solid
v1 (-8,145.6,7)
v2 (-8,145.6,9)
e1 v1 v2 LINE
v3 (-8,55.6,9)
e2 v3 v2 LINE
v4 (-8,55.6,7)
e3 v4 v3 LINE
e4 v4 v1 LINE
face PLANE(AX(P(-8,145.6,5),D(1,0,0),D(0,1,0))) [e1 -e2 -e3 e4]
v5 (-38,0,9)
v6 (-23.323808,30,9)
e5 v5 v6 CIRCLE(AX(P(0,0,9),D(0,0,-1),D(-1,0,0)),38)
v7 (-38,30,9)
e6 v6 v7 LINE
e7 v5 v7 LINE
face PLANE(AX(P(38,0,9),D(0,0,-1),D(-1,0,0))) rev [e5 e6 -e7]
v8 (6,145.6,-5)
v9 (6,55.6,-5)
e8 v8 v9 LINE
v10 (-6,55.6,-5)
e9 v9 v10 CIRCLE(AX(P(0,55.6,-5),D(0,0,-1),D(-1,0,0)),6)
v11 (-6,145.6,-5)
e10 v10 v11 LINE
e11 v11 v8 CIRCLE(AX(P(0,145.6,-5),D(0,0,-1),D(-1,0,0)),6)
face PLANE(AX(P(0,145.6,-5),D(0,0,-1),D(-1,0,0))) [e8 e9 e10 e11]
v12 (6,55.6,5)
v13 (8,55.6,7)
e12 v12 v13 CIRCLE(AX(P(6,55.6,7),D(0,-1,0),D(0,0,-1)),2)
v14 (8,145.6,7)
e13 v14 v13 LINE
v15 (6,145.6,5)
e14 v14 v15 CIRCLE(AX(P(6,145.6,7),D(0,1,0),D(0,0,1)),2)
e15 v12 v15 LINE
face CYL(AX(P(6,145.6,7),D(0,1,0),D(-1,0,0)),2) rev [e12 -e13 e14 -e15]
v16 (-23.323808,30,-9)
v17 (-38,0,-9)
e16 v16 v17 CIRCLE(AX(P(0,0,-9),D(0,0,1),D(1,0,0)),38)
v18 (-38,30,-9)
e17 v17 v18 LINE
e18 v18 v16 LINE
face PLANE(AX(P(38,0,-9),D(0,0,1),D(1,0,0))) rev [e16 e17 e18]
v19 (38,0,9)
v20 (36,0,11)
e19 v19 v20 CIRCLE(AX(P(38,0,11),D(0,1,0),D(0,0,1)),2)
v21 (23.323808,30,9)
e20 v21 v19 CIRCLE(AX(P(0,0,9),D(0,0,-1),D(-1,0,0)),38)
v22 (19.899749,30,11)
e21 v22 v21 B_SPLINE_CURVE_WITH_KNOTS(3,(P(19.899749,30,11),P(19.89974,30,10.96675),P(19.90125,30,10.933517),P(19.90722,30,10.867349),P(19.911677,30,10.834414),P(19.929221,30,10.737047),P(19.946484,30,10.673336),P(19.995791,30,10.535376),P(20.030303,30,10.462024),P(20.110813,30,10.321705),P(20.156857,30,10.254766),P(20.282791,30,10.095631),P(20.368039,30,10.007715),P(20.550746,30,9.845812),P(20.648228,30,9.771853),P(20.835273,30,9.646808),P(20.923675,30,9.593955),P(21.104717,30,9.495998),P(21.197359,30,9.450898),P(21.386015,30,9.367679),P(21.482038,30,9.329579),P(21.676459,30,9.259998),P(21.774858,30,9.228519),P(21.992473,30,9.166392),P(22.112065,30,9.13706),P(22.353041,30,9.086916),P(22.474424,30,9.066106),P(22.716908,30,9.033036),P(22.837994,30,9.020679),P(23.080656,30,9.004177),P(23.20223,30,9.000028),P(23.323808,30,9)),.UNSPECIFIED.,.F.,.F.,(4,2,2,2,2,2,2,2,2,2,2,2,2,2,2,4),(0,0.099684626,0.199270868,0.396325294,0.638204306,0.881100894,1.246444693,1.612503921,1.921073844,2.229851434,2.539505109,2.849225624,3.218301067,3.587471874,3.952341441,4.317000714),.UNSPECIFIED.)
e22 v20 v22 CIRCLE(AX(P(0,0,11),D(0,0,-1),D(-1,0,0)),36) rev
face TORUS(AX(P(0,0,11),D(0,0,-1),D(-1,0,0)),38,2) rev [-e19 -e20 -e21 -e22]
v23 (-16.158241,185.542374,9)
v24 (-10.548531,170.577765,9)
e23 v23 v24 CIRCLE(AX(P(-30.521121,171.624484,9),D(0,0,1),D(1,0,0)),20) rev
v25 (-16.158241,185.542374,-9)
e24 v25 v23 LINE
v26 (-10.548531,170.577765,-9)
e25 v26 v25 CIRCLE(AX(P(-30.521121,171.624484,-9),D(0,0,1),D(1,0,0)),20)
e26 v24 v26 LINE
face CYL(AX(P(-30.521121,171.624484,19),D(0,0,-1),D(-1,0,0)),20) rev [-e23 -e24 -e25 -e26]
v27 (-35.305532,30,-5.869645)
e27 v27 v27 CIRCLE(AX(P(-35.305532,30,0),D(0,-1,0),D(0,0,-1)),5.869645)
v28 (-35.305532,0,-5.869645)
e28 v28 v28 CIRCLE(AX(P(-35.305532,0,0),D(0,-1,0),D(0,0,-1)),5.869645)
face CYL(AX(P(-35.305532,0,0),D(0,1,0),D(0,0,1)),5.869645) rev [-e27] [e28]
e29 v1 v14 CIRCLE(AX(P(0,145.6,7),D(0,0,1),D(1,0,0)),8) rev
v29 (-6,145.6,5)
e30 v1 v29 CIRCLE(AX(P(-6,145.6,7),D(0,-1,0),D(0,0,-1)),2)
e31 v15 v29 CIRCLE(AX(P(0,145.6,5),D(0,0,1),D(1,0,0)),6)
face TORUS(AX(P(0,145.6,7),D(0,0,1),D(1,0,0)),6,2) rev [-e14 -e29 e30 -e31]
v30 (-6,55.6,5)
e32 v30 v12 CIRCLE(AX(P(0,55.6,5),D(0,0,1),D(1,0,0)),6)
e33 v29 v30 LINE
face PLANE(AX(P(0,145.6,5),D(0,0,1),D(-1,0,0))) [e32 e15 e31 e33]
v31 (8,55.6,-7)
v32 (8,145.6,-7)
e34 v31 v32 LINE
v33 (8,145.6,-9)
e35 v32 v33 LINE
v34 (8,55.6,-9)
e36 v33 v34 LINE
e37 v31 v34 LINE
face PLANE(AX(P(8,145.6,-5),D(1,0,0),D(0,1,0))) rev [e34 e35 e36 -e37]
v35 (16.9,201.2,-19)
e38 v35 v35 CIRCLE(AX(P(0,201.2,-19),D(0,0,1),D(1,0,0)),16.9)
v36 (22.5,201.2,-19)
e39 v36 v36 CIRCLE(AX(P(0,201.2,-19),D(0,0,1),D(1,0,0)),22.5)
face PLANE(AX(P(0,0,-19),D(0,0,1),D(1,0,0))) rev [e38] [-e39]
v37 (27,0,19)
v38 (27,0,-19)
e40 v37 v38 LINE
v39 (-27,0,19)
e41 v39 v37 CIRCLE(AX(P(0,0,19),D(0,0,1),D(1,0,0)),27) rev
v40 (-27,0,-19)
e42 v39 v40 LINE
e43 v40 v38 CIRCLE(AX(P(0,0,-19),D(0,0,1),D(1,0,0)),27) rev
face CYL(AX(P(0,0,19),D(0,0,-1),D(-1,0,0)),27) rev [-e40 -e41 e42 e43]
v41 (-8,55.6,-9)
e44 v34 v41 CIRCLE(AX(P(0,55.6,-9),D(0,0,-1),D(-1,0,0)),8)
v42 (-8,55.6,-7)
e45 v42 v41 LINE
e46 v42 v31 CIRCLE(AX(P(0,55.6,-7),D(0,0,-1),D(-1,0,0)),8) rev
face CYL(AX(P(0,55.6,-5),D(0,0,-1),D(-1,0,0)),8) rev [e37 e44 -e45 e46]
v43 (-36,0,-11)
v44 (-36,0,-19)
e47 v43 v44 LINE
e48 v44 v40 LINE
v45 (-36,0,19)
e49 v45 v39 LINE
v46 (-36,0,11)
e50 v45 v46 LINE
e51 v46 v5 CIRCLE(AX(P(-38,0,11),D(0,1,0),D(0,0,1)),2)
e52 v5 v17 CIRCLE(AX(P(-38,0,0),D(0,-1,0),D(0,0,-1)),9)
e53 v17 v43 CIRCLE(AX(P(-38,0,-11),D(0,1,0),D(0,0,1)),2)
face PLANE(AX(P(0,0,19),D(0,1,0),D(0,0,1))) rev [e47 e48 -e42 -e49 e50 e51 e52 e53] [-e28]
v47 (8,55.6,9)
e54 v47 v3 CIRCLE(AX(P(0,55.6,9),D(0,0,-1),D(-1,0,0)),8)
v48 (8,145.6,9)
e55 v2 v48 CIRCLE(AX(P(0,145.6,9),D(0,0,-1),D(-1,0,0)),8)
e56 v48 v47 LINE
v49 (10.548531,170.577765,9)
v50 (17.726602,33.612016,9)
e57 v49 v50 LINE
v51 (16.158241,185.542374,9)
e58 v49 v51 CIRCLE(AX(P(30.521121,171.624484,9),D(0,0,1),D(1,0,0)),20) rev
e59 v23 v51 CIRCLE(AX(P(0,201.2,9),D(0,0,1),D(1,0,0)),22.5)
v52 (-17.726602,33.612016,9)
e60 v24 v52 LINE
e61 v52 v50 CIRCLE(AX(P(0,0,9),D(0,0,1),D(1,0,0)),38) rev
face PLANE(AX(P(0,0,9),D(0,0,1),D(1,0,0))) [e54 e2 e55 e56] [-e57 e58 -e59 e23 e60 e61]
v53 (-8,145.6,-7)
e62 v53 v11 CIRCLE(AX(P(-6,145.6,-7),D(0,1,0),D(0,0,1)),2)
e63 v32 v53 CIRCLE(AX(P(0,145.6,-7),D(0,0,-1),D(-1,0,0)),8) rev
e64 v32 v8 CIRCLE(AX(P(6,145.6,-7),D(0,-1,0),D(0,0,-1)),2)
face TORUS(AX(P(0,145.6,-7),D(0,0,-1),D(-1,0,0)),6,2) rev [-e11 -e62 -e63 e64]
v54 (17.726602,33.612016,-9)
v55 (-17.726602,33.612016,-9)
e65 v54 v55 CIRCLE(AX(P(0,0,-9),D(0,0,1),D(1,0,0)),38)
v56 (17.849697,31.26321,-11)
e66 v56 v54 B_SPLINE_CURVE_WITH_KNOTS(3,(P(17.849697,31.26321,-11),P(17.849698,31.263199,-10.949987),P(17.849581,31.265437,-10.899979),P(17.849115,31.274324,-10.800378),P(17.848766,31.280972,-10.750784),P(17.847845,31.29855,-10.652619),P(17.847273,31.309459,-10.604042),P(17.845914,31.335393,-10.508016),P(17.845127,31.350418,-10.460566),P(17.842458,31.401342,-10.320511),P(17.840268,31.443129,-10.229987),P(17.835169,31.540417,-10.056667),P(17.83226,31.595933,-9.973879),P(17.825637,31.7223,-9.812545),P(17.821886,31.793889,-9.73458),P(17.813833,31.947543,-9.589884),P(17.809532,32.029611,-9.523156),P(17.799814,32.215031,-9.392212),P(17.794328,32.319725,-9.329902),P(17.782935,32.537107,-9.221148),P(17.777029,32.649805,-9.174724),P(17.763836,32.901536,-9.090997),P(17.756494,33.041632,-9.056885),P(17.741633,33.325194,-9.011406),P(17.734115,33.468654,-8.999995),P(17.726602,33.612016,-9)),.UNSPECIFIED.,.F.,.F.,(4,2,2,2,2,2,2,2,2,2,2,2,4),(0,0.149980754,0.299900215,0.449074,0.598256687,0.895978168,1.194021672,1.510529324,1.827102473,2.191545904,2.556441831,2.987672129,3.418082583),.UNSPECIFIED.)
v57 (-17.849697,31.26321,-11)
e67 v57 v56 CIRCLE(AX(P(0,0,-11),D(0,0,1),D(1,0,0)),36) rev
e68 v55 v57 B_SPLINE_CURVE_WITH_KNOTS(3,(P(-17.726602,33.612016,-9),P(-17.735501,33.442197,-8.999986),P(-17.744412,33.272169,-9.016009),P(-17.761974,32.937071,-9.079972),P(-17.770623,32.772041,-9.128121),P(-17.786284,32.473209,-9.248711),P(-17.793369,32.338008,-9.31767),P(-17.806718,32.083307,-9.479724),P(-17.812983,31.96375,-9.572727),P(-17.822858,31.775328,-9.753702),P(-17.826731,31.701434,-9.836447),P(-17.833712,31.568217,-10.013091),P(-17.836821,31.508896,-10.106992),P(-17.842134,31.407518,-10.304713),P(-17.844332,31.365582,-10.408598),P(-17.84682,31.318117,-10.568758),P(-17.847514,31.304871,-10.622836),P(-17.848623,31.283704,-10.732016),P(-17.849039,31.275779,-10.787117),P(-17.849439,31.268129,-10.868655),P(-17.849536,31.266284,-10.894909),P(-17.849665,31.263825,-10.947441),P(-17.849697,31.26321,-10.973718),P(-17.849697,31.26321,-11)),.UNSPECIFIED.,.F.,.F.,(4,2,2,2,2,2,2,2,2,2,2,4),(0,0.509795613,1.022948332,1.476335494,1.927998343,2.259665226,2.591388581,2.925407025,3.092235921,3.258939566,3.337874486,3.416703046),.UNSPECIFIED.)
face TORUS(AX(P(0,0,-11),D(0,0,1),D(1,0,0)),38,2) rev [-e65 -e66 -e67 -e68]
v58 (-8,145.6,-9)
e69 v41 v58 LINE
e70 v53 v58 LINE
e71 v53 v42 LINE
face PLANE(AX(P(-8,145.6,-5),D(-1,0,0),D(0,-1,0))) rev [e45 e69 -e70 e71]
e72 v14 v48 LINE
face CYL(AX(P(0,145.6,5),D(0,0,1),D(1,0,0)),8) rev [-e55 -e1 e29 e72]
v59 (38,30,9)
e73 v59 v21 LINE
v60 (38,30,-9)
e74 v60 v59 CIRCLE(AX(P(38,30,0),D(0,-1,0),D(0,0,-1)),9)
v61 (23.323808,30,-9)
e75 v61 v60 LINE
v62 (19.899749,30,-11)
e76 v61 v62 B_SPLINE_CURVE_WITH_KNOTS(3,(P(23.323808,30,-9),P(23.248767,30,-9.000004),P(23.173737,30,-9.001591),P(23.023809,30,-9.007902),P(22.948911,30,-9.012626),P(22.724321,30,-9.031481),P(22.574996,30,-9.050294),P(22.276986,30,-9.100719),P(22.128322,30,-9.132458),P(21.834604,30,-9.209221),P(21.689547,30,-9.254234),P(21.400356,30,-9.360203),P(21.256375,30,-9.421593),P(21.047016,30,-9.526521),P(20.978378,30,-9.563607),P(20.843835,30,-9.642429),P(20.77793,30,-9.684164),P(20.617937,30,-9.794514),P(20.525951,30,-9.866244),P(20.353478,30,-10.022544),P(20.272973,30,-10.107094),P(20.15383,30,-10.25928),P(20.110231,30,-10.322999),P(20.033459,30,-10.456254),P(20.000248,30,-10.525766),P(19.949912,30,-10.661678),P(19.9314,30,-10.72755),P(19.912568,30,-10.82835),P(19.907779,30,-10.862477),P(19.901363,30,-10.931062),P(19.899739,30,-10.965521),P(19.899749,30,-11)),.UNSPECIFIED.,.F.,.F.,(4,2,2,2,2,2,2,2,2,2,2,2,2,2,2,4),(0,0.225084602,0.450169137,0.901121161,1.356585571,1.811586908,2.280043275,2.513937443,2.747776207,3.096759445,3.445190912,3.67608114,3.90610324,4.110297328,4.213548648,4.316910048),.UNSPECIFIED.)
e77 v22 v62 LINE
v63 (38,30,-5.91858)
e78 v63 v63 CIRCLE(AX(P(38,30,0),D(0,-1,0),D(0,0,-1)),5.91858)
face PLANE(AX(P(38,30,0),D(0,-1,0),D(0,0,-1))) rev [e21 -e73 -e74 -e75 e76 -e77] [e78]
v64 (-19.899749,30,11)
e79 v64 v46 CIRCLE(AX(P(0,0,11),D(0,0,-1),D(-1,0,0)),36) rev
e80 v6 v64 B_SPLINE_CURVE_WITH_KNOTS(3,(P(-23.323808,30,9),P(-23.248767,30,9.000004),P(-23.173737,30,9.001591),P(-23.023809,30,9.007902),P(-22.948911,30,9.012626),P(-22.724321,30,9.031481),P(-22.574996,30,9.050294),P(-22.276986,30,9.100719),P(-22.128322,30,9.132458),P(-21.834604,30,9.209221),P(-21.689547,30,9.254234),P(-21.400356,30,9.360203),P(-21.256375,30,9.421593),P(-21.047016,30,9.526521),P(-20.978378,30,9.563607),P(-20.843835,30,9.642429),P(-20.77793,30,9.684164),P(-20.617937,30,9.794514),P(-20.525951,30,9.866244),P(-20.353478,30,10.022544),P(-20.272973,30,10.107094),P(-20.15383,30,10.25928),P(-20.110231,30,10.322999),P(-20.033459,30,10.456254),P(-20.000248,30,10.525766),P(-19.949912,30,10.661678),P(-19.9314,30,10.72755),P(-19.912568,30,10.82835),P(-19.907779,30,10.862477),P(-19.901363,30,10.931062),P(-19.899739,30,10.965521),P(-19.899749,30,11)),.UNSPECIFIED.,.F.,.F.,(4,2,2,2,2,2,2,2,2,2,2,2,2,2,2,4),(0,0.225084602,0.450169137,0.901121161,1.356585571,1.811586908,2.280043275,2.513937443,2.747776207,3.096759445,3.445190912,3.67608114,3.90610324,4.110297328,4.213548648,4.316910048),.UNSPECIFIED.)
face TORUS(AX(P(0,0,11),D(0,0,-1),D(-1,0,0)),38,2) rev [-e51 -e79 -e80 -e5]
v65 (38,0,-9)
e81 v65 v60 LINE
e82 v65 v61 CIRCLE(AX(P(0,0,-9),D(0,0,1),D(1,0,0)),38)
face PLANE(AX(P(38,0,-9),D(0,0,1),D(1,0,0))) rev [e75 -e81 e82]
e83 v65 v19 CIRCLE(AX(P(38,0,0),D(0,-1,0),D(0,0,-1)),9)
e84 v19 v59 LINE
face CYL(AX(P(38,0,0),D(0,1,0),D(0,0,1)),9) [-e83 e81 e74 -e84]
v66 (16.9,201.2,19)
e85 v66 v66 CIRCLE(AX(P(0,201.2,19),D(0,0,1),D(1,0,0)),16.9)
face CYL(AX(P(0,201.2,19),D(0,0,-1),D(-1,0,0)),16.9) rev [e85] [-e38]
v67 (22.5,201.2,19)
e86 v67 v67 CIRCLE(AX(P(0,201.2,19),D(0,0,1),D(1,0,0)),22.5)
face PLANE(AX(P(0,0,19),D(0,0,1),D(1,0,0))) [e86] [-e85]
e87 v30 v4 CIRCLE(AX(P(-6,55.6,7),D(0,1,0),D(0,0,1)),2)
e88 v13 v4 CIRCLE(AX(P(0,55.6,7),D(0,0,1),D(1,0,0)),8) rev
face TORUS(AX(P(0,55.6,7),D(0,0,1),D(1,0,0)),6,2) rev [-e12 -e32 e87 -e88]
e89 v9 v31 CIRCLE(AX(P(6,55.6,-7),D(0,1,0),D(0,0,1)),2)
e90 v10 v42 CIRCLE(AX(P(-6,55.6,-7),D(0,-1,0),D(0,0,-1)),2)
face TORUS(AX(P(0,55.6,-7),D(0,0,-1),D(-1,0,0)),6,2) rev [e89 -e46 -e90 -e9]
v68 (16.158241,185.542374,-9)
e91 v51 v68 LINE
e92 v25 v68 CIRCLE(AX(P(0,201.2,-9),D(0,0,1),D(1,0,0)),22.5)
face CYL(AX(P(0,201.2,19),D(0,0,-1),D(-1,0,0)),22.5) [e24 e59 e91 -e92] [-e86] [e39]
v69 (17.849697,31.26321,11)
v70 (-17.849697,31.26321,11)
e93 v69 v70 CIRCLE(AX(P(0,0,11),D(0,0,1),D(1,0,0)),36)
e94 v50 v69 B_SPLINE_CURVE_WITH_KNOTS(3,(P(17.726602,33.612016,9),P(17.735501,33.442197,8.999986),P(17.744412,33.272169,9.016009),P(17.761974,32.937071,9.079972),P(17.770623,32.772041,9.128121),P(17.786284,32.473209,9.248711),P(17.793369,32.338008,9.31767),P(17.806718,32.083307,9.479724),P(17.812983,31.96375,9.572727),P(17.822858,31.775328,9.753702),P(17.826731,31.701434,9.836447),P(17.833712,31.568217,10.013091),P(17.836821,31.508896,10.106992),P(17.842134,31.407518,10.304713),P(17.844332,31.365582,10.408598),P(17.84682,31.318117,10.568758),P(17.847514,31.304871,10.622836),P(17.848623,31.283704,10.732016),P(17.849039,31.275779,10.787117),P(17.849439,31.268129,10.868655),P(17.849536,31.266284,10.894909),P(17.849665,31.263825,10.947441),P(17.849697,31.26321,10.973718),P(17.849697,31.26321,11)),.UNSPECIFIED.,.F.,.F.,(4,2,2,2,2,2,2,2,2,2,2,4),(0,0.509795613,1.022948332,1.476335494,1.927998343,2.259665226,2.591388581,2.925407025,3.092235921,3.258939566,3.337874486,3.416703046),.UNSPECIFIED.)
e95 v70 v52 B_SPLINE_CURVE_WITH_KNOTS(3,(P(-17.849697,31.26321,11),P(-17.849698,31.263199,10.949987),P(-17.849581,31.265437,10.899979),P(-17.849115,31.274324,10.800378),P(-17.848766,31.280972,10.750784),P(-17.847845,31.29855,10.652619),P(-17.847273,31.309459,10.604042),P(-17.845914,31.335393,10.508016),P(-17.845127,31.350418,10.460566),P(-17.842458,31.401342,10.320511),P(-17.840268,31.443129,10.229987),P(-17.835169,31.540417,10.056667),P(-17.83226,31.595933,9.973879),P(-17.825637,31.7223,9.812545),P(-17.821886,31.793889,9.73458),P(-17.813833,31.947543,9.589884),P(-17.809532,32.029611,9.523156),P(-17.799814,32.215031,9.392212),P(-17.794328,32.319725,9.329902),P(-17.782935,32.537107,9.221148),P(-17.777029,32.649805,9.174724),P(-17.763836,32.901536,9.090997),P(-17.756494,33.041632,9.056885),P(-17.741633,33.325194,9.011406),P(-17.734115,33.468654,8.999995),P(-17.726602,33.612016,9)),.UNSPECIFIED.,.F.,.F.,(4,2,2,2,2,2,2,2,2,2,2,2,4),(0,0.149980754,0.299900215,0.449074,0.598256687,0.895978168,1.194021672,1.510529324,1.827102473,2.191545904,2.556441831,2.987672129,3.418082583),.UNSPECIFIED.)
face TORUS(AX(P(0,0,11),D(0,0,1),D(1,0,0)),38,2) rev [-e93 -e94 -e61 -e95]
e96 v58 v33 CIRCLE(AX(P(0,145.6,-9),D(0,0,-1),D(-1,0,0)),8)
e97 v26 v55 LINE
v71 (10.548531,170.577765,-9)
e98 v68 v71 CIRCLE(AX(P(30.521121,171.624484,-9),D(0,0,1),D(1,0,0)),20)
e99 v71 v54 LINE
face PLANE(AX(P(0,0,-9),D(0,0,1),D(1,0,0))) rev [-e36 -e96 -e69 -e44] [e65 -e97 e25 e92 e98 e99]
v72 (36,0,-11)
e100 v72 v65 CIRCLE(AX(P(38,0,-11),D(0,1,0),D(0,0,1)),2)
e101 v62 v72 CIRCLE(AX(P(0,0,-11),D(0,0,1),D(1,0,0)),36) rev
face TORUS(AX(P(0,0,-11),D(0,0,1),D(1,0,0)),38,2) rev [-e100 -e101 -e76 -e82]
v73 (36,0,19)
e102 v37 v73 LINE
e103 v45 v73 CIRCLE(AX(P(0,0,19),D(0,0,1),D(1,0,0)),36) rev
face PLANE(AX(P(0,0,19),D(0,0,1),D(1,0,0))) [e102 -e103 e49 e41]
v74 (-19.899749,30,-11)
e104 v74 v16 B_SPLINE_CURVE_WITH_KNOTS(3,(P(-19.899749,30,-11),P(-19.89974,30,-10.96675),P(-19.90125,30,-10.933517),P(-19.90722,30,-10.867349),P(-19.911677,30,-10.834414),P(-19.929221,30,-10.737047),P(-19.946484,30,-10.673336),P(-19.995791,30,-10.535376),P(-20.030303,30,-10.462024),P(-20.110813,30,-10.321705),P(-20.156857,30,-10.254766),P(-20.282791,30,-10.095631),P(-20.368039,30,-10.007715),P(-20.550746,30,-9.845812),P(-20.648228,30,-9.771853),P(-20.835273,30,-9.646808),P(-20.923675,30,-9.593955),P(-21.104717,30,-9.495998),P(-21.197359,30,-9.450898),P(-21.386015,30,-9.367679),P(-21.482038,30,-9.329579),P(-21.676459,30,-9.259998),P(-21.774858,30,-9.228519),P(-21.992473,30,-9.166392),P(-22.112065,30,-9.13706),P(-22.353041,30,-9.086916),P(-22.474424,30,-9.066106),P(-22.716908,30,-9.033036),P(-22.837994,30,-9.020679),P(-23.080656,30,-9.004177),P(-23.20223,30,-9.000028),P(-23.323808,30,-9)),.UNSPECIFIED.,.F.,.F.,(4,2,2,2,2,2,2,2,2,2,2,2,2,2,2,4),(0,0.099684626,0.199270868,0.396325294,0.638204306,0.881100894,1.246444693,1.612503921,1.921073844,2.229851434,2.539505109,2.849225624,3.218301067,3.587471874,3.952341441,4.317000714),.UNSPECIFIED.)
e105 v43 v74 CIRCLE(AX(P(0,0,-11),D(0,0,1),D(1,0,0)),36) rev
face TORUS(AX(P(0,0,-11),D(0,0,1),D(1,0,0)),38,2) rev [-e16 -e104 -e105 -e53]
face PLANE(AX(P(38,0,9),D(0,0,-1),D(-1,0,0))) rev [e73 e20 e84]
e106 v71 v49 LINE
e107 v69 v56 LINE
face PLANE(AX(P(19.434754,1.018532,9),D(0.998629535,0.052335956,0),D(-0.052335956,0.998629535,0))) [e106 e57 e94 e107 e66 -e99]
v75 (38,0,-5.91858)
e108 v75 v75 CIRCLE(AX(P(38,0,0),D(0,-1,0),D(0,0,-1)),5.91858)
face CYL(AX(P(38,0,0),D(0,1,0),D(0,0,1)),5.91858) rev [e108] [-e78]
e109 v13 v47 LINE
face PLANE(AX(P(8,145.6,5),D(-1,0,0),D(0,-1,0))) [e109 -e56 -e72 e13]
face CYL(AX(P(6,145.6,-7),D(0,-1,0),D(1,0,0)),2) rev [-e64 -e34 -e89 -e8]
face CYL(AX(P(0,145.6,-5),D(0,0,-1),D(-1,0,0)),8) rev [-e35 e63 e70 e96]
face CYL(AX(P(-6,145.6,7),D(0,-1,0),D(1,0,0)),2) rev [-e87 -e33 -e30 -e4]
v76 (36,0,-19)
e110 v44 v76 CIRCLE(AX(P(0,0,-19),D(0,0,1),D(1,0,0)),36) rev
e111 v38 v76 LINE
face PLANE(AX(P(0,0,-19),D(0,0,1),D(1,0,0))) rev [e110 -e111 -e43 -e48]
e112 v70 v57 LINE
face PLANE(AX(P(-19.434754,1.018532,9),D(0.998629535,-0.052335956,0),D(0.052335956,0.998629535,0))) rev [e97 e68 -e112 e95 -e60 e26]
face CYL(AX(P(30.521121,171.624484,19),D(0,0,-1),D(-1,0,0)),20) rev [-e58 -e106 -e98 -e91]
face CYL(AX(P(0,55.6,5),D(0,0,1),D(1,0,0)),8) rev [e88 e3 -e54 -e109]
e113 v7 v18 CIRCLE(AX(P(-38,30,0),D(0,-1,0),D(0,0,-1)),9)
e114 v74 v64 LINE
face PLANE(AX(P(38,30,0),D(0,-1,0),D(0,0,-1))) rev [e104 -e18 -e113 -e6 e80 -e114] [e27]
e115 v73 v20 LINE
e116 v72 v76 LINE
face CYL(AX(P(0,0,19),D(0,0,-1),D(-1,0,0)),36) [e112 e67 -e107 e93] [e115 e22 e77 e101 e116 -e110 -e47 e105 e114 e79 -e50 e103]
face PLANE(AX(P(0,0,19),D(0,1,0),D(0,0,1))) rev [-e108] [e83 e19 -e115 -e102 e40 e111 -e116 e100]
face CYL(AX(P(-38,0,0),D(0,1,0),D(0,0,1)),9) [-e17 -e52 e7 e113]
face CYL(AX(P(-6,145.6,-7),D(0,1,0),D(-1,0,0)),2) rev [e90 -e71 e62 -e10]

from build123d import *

# Parameters (mm, degrees)
BOSS_EXTRUDE1_DEPTH   = 19
SKETCH1_R             = 22.5
SKETCH1_R_2           = 16.9
BOSS_EXTRUDE1_2_DEPTH = 19
BOSS_EXTRUDE2_DEPTH   = 9
CUT_EXTRUDE1_DEPTH    = 4
FILLET1_R             = 2
FILLET2_R             = 20
SKETCH3_R             = 5.918580101
SKETCH3_R_2           = 5.86964533
BOSS_EXTRUDE3_DEPTH   = 30
CUT_EXTRUDE2_DEPTH    = 231.292618206
SKETCH5_R             = 5.86964533
SKETCH5_R_2           = 5.918580101
CUT_EXTRUDE3_DEPTH    = 201.224099449
FILLET3_R             = 2


with BuildPart() as part:
    # Sketch1 → Boss-Extrude1 (new, symmetric)
    with BuildSketch(Plane.XY):
        with BuildLine():
            ThreePointArc((-27, 0), (0, 27), (27, 0))
            Line((27, 0), (36, 0))
            ThreePointArc((36, 0), (0, 36), (-36, 0))
            Line((-36, 0), (-27, 0))
        make_face()
    extrude(amount=BOSS_EXTRUDE1_DEPTH, both=True)



with BuildPart() as body_2:
    # Sketch1 → Boss-Extrude1 2 (new, symmetric)
    with BuildSketch(Plane.XY):
        with Locations((0, 201.2)):
            Circle(SKETCH1_R)
        with Locations((0, 201.2)):
            Circle(SKETCH1_R_2, mode=Mode.SUBTRACT)
    extrude(amount=BOSS_EXTRUDE1_2_DEPTH, both=True)


with BuildPart() as part_1:
    add(part.part)

    add(body_2.part)  # Boss-Extrude2 merges body 2
    # Sketch1<3> → Boss-Extrude2 (add, symmetric)
    with BuildSketch(Plane.XY):
        with BuildLine():
            ThreePointArc((-17.849697213, 31.263210159), (0, 36), (17.849697213, 31.263210159))
            Line((17.849697213, 31.263210159), (10, 181.044355629))
            ThreePointArc((10, 181.044355629), (0, 178.7), (-10, 181.044355629))
            Line((-10, 181.044355629), (-17.849697213, 31.263210159))
        make_face()
    extrude(amount=BOSS_EXTRUDE2_DEPTH, both=True)

    # Sketch2 → Cut-Extrude1 (cut)
    with BuildSketch(Plane(origin=(0, 0, -9), x_dir=(-1, 0, 0), z_dir=(0, 0, -1))):
        with BuildLine():
            Line((8, 145.6), (8, 55.6))
            ThreePointArc((8, 55.6), (0, 47.6), (-8, 55.6))
            Line((-8, 55.6), (-8, 145.6))
            ThreePointArc((-8, 145.6), (0, 153.6), (8, 145.6))
        make_face()
    cut_extrude1 = extrude(amount=-CUT_EXTRUDE1_DEPTH, mode=Mode.SUBTRACT)

    # Mirror1: Cut-Extrude1 across plane
    add(cut_extrude1.mirror(Plane.XY), mode=Mode.SUBTRACT)

    # Fillet1
    fillet1_edges = [part_1.edges().sort_by_distance(p)[0] for p in [
        (8, 100.6, 5),
        (0, 47.6, 5),
        (-8, 100.6, 5),
        (0, 153.6, 5),
        (-8, 100.6, -5),
        (0, 47.6, -5),
        (8, 100.6, -5),
        (0, 153.6, -5),
    ]]
    fillet(fillet1_edges, radius=FILLET1_R)

    # Fillet2
    fillet2_edges = [part_1.edges().sort_by_distance(p)[0] for p in [
        (-10, 181.044355629, 0),
        (10, 181.044355629, 0),
    ]]
    fillet(fillet2_edges, radius=FILLET2_R)

    # Sketch3 → Boss-Extrude3 (add)
    with BuildSketch(Plane(origin=(0, 30, 0), x_dir=(-1, 0, 0), z_dir=(0, -1, 0))):
        with BuildLine():
            Line((-38, 9), (38, 9))
            ThreePointArc((38, 9), (47, 0), (38, -9))
            Line((38, -9), (-38, -9))
            ThreePointArc((-38, -9), (-47, 0), (-38, 9))
        make_face()
        with Locations((-38, 0)):
            Circle(SKETCH3_R, mode=Mode.SUBTRACT)
        with Locations((35.305532021, 0)):
            Circle(SKETCH3_R_2, mode=Mode.SUBTRACT)
    extrude(amount=BOSS_EXTRUDE3_DEPTH)

    # Sketch4 → Cut-Extrude2 (cut, through all)
    with BuildSketch(Plane(origin=(0, 0, -9), x_dir=(-1, 0, 0), z_dir=(0, 0, -1))):
        with BuildLine():
            Line((-27, 0), (27, 0))
            ThreePointArc((27, 0), (0, 27), (-27, 0))
        make_face()
    extrude(amount=-CUT_EXTRUDE2_DEPTH, mode=Mode.SUBTRACT)

    # Sketch5 → Cut-Extrude3 (cut, through all)
    with BuildSketch(Plane(origin=(0, 30, 0), x_dir=(1, 0, 0), z_dir=(0, 1, 0))):
        with Locations((-35.305532021, 0)):
            Circle(SKETCH5_R)
        with Locations((38, 0)):
            Circle(SKETCH5_R_2)
    extrude(amount=-CUT_EXTRUDE3_DEPTH, mode=Mode.SUBTRACT)

    # Fillet3
    fillet3_edges = [part_1.edges().sort_by_distance(p)[0] for p in [
        (-31.720584442, 17.023645986, -9),
        (0, 36, -9),
        (31.720584442, 17.023645986, -9),
        (31.720584442, 17.023645986, 9),
        (-31.720584442, 17.023645986, 9),
        (0, 36, 9),
    ]]
    fillet(fillet3_edges, radius=FILLET3_R)


solid = part_1.part
